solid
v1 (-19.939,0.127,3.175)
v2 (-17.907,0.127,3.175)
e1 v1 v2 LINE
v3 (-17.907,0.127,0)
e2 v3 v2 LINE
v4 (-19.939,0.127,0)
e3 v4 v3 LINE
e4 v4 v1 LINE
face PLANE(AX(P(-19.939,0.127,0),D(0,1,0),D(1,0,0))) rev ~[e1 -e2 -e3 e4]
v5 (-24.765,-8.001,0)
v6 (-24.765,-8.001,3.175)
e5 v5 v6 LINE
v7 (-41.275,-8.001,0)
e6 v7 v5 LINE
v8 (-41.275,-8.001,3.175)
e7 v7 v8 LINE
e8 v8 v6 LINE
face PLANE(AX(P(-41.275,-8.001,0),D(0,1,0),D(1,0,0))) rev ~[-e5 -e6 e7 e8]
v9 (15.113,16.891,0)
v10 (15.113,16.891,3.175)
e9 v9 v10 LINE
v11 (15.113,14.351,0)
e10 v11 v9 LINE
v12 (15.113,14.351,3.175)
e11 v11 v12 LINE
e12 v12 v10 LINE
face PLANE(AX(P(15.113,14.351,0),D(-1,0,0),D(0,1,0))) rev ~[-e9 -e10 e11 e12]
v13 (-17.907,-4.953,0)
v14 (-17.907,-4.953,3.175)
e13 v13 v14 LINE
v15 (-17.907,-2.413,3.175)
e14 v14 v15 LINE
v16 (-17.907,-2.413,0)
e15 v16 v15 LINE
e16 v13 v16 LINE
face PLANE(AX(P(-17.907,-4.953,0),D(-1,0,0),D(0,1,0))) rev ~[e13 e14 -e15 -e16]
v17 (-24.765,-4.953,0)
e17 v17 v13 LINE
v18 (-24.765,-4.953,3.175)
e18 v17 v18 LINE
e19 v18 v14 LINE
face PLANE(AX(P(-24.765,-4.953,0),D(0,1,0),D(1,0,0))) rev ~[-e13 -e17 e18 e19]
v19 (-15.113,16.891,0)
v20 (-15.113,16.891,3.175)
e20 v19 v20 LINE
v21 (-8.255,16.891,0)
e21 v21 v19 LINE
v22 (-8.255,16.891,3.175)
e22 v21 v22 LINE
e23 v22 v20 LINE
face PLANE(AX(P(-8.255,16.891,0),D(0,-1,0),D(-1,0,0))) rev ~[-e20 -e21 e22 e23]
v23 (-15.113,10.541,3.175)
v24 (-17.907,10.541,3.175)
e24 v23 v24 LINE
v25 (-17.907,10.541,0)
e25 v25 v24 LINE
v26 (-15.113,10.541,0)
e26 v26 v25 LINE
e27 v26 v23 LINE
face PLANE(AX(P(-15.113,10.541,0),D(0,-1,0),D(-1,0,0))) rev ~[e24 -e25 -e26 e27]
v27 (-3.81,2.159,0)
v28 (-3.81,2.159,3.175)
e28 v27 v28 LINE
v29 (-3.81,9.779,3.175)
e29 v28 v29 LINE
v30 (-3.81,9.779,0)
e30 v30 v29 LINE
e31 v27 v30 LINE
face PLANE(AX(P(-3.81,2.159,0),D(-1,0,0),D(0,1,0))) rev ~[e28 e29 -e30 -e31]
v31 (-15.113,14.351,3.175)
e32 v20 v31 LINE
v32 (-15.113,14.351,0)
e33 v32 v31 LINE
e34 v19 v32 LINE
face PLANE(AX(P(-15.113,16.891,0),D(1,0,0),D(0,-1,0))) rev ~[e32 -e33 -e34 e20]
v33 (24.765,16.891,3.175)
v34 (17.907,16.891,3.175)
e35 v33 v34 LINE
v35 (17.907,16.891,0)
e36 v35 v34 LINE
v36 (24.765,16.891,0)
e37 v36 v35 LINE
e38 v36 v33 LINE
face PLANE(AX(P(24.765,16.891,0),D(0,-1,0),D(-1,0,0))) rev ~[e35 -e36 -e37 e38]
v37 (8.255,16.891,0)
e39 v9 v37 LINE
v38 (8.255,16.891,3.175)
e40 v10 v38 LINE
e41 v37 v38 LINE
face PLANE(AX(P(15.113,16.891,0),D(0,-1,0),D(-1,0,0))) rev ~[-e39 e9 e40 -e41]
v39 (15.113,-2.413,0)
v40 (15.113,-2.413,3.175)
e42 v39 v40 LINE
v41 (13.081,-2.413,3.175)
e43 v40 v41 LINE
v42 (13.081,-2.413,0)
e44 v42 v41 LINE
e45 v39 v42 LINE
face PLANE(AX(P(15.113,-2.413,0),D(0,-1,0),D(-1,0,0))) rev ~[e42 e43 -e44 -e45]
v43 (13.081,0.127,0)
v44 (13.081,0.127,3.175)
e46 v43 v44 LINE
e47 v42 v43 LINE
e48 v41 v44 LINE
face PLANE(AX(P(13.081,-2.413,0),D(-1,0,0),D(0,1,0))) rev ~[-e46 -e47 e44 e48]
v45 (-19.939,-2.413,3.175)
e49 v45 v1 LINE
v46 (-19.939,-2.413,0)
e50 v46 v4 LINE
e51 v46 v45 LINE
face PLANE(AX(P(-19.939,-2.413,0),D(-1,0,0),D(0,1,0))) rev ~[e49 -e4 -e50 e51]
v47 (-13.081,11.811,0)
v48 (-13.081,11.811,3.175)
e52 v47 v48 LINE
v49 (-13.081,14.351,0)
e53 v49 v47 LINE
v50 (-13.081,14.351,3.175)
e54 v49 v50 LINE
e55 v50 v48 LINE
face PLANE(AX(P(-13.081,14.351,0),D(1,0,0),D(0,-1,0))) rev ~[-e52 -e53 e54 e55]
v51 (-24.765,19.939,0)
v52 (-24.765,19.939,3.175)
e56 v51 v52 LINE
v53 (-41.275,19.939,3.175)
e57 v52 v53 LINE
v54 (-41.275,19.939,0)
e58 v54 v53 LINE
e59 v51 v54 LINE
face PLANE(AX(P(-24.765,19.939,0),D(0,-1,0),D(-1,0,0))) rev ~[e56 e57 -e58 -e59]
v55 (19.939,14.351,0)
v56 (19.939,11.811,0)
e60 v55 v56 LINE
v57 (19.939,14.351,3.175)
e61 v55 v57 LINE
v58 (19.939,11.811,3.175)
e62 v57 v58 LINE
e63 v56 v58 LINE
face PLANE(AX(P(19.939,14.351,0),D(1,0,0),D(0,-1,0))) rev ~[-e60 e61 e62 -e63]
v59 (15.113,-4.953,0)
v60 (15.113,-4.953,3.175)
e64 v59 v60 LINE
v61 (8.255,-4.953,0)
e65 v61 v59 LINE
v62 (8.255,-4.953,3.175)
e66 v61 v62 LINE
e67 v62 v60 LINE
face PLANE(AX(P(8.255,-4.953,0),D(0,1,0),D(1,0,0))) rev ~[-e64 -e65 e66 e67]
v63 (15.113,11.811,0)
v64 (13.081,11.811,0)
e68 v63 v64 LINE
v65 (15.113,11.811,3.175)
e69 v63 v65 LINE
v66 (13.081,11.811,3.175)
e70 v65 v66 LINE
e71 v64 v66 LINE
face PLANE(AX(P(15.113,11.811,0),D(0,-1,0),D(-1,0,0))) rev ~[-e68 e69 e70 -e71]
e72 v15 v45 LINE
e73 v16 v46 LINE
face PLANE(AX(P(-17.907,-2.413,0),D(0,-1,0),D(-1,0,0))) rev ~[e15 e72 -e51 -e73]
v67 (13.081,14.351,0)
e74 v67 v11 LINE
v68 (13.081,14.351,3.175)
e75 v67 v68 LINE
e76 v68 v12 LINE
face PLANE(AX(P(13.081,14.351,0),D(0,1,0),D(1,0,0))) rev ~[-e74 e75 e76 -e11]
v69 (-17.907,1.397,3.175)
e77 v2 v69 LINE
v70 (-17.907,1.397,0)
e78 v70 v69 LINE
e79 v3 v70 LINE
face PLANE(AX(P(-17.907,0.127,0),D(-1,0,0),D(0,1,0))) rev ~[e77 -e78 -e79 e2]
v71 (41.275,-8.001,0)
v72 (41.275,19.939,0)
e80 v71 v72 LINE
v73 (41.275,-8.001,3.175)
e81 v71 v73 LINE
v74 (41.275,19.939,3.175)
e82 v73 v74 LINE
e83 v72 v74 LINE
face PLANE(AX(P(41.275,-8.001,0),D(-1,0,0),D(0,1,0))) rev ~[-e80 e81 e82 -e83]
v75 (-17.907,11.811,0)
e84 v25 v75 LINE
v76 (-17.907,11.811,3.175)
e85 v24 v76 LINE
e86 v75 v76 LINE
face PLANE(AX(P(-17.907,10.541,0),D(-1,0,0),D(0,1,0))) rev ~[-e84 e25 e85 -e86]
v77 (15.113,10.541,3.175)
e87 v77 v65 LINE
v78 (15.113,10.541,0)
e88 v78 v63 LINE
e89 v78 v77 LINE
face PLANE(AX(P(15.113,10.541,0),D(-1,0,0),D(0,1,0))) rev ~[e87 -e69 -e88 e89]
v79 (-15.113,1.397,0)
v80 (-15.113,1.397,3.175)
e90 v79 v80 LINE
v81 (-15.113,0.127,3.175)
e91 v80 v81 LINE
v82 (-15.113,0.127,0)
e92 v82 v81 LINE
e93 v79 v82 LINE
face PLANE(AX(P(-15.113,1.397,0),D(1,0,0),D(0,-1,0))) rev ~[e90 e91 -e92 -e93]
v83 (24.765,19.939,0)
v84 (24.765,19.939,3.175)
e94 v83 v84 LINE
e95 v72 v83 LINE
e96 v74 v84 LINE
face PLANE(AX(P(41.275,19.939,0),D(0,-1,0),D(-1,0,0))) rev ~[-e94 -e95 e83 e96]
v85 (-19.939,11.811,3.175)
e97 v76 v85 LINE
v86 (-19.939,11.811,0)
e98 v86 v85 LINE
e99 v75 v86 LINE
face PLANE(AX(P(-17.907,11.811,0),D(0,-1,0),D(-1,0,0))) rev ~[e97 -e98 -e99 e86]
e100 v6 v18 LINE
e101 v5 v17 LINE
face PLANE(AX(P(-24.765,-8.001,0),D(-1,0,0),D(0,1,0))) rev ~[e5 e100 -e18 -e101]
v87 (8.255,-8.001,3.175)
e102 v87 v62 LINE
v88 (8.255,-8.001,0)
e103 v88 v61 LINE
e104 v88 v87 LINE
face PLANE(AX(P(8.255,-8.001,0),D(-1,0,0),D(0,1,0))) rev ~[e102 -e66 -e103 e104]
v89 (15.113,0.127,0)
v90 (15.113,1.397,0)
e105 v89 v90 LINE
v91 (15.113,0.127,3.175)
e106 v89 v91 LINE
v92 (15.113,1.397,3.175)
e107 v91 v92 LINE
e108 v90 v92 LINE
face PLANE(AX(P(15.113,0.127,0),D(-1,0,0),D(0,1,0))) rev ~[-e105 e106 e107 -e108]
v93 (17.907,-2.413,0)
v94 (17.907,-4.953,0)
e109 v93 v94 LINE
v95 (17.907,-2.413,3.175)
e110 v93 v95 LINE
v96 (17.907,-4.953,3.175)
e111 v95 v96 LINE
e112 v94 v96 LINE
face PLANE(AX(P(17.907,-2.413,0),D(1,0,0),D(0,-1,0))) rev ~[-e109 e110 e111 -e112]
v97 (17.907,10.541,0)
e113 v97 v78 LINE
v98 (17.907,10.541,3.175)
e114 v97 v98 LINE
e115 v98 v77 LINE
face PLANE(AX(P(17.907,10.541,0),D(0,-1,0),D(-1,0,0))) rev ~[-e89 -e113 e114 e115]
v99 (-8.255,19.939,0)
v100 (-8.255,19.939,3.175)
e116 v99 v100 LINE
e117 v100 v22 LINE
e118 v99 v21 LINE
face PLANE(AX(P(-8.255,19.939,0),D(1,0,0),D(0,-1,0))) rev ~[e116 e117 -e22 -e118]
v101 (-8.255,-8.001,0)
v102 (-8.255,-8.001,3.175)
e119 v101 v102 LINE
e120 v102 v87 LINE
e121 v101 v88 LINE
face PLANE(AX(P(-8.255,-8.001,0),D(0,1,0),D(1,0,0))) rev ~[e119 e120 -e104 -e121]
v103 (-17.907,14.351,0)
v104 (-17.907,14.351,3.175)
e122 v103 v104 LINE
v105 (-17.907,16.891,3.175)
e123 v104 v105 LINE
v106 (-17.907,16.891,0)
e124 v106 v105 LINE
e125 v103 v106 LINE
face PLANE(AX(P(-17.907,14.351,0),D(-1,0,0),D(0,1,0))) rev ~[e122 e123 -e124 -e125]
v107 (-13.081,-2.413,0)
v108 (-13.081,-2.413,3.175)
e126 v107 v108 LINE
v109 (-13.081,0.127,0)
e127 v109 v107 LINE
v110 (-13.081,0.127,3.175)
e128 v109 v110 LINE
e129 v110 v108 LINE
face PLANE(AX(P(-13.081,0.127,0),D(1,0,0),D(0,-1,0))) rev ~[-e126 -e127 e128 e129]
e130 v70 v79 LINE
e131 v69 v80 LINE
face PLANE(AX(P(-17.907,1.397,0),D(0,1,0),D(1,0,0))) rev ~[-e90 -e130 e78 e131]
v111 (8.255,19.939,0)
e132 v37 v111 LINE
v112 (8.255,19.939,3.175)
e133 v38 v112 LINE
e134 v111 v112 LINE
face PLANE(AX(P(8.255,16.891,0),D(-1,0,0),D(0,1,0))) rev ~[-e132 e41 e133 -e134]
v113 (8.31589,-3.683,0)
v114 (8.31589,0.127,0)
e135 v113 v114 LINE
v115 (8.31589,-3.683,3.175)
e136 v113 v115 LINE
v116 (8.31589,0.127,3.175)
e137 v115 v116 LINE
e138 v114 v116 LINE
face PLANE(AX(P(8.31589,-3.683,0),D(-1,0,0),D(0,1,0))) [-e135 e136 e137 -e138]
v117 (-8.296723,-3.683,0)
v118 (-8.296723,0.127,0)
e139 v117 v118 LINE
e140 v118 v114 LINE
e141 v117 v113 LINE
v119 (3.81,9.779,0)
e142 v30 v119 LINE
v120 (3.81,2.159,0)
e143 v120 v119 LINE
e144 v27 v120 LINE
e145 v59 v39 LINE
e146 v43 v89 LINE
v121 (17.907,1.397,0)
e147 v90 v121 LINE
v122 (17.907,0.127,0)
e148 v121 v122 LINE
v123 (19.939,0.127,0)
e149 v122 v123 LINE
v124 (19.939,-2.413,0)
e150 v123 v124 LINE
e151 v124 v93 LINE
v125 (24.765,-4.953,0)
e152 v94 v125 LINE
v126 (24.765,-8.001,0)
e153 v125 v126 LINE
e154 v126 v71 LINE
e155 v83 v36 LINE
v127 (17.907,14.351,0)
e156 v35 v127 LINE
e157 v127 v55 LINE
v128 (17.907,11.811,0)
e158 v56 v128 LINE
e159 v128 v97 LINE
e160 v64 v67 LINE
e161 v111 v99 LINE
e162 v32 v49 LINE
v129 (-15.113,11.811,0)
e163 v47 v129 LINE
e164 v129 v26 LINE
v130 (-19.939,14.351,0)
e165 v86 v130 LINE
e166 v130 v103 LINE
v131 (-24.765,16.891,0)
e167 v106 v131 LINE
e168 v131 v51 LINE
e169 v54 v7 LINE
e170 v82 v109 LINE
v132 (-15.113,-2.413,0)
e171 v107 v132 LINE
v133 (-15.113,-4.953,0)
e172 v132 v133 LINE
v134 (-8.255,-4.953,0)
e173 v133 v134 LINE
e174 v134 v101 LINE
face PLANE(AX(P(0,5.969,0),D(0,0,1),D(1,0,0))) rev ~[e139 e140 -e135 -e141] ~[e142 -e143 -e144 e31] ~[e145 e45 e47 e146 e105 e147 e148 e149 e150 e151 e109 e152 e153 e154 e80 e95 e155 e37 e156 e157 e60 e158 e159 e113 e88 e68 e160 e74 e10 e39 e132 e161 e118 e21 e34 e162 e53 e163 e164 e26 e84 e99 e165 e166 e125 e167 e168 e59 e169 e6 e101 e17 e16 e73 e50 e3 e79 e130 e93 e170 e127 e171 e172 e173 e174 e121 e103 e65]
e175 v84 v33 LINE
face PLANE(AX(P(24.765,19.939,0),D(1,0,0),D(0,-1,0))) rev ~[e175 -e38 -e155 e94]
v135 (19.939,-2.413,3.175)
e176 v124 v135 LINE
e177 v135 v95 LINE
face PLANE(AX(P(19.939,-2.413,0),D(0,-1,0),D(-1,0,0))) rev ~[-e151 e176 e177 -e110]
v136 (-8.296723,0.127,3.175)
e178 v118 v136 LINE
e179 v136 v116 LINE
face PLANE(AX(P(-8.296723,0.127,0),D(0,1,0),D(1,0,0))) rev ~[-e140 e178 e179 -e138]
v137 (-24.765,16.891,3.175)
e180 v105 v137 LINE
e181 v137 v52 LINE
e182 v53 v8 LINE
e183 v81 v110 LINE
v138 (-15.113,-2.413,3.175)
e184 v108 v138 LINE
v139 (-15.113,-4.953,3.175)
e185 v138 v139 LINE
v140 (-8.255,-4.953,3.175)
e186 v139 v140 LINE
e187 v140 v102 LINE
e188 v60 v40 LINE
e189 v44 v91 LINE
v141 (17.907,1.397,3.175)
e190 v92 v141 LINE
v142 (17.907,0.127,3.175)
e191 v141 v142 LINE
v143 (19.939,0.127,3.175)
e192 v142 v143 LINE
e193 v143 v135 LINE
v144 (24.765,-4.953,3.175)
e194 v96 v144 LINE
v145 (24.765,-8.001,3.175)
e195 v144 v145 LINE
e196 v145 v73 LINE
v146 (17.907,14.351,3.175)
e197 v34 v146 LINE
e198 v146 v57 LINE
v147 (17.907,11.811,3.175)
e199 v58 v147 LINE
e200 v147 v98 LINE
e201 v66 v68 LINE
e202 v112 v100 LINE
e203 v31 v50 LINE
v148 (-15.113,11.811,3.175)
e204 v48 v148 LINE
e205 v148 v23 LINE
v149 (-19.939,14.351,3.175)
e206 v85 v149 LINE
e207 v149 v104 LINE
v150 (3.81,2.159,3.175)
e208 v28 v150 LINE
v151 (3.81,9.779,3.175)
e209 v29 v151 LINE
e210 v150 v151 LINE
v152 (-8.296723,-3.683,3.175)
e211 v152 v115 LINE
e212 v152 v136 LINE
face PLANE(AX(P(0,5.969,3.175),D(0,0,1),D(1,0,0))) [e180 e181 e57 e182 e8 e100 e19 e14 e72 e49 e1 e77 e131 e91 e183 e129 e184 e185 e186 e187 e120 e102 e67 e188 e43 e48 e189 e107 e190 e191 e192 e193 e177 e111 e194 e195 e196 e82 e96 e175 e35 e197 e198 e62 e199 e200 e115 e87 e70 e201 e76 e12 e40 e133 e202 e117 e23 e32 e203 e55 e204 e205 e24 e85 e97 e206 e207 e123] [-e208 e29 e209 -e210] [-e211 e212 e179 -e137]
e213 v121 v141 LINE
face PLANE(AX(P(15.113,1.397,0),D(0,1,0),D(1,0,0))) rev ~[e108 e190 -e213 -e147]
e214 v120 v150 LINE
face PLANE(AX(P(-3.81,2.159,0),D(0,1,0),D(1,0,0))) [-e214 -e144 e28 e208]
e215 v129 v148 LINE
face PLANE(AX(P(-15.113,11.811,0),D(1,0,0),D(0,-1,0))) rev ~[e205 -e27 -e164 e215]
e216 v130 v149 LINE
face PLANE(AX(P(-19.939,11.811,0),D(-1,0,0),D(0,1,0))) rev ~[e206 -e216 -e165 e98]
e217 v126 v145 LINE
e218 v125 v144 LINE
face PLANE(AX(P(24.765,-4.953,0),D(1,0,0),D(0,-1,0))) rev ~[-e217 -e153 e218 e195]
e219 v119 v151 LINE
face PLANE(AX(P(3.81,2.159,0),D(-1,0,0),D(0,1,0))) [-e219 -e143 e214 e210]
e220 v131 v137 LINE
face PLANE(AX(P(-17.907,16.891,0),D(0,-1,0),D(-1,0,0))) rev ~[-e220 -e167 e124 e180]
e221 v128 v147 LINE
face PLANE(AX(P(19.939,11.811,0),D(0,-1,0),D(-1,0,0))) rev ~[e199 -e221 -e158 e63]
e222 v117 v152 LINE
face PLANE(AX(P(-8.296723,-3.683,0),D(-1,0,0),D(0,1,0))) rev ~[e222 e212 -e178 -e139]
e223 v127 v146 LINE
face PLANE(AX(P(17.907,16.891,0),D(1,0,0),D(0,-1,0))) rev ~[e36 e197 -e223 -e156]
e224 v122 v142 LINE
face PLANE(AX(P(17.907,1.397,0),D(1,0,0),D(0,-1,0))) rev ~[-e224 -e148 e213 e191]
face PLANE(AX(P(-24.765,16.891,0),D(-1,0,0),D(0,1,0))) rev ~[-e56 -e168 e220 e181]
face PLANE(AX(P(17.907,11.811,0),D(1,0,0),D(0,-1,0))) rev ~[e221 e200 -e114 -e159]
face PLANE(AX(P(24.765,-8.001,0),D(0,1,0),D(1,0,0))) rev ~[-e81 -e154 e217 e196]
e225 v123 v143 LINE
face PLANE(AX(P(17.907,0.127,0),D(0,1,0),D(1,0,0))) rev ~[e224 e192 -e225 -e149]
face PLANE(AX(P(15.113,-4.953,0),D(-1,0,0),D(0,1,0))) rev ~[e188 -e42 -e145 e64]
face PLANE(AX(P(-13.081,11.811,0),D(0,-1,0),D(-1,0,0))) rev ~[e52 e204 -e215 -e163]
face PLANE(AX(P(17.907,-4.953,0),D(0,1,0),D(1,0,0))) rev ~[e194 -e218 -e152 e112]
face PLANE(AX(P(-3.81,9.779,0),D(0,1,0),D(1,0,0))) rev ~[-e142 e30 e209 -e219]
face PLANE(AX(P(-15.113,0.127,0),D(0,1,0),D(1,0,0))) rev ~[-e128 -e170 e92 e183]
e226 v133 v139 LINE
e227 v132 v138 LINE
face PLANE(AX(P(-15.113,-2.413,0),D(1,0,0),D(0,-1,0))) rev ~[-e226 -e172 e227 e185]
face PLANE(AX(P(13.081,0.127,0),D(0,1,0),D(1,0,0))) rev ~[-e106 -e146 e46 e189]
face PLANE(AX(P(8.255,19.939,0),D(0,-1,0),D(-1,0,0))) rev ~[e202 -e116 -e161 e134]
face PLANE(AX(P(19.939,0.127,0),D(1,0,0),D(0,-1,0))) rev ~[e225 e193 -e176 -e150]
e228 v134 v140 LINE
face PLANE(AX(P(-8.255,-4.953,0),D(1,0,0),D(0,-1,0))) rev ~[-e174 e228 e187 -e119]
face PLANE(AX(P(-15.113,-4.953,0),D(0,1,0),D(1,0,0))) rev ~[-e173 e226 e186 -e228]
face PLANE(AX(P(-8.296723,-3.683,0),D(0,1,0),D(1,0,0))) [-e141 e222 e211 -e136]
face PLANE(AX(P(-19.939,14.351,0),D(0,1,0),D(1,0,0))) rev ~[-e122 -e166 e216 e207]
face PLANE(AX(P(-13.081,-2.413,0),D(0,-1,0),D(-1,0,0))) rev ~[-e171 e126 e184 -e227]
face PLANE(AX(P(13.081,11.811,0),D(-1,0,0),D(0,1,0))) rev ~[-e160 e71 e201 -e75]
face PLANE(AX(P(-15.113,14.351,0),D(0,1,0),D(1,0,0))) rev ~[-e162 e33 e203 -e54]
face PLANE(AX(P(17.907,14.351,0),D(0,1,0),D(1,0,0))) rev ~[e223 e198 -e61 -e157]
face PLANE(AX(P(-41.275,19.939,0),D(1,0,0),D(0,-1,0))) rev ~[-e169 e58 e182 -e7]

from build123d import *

# Parameters (mm, degrees)
F0_W     = 16.6126135737
F0_H     = 3.81
F0_W_2   = 7.62
F0_H_2   = 7.62
F1_DEPTH = 3.175


# Not quite as in the source:
# - a length typed as a fraction of an inch, garbled in the dataset ("3 / 203.2 mm" for 3/8 in), is restored
# - a feature names something its author has since deleted; it is built from what else it names


with BuildPart() as f1:
    # F0 (on Top) → F1 (new body)
    with BuildSketch(Plane.XY):
        Polygon((24.765, -8.001), (41.275, -8.001), (41.275, 19.939), (24.765, 19.939), (24.765, 16.891), (17.907, 16.891), (17.907, 14.351), (19.939, 14.351), (19.939, 11.811), (17.907, 11.811), (17.907, 10.541), (15.113, 10.541), (15.113, 11.811), (13.081, 11.811), (13.081, 14.351), (15.113, 14.351), (15.113, 16.891), (8.255, 16.891), (8.255, 19.939), (-8.255, 19.939), (-8.255, 16.891), (-15.113, 16.891), (-15.113, 14.351), (-13.081, 14.351), (-13.081, 11.811), (-15.113, 11.811), (-15.113, 10.541), (-17.907, 10.541), (-17.907, 11.811), (-19.939, 11.811), (-19.939, 14.351), (-17.907, 14.351), (-17.907, 16.891), (-24.765, 16.891), (-24.765, 19.939), (-41.275, 19.939), (-41.275, -8.001), (-24.765, -8.001), (-24.765, -4.953), (-17.907, -4.953), (-17.907, -2.413), (-19.939, -2.413), (-19.939, 0.127), (-17.907, 0.127), (-17.907, 1.397), (-15.113, 1.397), (-15.113, 0.127), (-13.081, 0.127), (-13.081, -2.413), (-15.113, -2.413), (-15.113, -4.953), (-8.255, -4.953), (-8.255, -8.001), (8.255, -8.001), (8.255, -4.953), (15.113, -4.953), (15.113, -2.413), (13.081, -2.413), (13.081, 0.127), (15.113, 0.127), (15.113, 1.397), (17.907, 1.397), (17.907, 0.127), (19.939, 0.127), (19.939, -2.413), (17.907, -2.413), (17.907, -4.953), (24.765, -4.953), align=None)
        with Locations((0.0095833093, -1.778)):
            Rectangle(F0_W, F0_H, mode=Mode.SUBTRACT)
        with Locations((0, 5.969)):
            Rectangle(F0_W_2, F0_H_2, mode=Mode.SUBTRACT)
    extrude(amount=F1_DEPTH)


solid = f1.part
